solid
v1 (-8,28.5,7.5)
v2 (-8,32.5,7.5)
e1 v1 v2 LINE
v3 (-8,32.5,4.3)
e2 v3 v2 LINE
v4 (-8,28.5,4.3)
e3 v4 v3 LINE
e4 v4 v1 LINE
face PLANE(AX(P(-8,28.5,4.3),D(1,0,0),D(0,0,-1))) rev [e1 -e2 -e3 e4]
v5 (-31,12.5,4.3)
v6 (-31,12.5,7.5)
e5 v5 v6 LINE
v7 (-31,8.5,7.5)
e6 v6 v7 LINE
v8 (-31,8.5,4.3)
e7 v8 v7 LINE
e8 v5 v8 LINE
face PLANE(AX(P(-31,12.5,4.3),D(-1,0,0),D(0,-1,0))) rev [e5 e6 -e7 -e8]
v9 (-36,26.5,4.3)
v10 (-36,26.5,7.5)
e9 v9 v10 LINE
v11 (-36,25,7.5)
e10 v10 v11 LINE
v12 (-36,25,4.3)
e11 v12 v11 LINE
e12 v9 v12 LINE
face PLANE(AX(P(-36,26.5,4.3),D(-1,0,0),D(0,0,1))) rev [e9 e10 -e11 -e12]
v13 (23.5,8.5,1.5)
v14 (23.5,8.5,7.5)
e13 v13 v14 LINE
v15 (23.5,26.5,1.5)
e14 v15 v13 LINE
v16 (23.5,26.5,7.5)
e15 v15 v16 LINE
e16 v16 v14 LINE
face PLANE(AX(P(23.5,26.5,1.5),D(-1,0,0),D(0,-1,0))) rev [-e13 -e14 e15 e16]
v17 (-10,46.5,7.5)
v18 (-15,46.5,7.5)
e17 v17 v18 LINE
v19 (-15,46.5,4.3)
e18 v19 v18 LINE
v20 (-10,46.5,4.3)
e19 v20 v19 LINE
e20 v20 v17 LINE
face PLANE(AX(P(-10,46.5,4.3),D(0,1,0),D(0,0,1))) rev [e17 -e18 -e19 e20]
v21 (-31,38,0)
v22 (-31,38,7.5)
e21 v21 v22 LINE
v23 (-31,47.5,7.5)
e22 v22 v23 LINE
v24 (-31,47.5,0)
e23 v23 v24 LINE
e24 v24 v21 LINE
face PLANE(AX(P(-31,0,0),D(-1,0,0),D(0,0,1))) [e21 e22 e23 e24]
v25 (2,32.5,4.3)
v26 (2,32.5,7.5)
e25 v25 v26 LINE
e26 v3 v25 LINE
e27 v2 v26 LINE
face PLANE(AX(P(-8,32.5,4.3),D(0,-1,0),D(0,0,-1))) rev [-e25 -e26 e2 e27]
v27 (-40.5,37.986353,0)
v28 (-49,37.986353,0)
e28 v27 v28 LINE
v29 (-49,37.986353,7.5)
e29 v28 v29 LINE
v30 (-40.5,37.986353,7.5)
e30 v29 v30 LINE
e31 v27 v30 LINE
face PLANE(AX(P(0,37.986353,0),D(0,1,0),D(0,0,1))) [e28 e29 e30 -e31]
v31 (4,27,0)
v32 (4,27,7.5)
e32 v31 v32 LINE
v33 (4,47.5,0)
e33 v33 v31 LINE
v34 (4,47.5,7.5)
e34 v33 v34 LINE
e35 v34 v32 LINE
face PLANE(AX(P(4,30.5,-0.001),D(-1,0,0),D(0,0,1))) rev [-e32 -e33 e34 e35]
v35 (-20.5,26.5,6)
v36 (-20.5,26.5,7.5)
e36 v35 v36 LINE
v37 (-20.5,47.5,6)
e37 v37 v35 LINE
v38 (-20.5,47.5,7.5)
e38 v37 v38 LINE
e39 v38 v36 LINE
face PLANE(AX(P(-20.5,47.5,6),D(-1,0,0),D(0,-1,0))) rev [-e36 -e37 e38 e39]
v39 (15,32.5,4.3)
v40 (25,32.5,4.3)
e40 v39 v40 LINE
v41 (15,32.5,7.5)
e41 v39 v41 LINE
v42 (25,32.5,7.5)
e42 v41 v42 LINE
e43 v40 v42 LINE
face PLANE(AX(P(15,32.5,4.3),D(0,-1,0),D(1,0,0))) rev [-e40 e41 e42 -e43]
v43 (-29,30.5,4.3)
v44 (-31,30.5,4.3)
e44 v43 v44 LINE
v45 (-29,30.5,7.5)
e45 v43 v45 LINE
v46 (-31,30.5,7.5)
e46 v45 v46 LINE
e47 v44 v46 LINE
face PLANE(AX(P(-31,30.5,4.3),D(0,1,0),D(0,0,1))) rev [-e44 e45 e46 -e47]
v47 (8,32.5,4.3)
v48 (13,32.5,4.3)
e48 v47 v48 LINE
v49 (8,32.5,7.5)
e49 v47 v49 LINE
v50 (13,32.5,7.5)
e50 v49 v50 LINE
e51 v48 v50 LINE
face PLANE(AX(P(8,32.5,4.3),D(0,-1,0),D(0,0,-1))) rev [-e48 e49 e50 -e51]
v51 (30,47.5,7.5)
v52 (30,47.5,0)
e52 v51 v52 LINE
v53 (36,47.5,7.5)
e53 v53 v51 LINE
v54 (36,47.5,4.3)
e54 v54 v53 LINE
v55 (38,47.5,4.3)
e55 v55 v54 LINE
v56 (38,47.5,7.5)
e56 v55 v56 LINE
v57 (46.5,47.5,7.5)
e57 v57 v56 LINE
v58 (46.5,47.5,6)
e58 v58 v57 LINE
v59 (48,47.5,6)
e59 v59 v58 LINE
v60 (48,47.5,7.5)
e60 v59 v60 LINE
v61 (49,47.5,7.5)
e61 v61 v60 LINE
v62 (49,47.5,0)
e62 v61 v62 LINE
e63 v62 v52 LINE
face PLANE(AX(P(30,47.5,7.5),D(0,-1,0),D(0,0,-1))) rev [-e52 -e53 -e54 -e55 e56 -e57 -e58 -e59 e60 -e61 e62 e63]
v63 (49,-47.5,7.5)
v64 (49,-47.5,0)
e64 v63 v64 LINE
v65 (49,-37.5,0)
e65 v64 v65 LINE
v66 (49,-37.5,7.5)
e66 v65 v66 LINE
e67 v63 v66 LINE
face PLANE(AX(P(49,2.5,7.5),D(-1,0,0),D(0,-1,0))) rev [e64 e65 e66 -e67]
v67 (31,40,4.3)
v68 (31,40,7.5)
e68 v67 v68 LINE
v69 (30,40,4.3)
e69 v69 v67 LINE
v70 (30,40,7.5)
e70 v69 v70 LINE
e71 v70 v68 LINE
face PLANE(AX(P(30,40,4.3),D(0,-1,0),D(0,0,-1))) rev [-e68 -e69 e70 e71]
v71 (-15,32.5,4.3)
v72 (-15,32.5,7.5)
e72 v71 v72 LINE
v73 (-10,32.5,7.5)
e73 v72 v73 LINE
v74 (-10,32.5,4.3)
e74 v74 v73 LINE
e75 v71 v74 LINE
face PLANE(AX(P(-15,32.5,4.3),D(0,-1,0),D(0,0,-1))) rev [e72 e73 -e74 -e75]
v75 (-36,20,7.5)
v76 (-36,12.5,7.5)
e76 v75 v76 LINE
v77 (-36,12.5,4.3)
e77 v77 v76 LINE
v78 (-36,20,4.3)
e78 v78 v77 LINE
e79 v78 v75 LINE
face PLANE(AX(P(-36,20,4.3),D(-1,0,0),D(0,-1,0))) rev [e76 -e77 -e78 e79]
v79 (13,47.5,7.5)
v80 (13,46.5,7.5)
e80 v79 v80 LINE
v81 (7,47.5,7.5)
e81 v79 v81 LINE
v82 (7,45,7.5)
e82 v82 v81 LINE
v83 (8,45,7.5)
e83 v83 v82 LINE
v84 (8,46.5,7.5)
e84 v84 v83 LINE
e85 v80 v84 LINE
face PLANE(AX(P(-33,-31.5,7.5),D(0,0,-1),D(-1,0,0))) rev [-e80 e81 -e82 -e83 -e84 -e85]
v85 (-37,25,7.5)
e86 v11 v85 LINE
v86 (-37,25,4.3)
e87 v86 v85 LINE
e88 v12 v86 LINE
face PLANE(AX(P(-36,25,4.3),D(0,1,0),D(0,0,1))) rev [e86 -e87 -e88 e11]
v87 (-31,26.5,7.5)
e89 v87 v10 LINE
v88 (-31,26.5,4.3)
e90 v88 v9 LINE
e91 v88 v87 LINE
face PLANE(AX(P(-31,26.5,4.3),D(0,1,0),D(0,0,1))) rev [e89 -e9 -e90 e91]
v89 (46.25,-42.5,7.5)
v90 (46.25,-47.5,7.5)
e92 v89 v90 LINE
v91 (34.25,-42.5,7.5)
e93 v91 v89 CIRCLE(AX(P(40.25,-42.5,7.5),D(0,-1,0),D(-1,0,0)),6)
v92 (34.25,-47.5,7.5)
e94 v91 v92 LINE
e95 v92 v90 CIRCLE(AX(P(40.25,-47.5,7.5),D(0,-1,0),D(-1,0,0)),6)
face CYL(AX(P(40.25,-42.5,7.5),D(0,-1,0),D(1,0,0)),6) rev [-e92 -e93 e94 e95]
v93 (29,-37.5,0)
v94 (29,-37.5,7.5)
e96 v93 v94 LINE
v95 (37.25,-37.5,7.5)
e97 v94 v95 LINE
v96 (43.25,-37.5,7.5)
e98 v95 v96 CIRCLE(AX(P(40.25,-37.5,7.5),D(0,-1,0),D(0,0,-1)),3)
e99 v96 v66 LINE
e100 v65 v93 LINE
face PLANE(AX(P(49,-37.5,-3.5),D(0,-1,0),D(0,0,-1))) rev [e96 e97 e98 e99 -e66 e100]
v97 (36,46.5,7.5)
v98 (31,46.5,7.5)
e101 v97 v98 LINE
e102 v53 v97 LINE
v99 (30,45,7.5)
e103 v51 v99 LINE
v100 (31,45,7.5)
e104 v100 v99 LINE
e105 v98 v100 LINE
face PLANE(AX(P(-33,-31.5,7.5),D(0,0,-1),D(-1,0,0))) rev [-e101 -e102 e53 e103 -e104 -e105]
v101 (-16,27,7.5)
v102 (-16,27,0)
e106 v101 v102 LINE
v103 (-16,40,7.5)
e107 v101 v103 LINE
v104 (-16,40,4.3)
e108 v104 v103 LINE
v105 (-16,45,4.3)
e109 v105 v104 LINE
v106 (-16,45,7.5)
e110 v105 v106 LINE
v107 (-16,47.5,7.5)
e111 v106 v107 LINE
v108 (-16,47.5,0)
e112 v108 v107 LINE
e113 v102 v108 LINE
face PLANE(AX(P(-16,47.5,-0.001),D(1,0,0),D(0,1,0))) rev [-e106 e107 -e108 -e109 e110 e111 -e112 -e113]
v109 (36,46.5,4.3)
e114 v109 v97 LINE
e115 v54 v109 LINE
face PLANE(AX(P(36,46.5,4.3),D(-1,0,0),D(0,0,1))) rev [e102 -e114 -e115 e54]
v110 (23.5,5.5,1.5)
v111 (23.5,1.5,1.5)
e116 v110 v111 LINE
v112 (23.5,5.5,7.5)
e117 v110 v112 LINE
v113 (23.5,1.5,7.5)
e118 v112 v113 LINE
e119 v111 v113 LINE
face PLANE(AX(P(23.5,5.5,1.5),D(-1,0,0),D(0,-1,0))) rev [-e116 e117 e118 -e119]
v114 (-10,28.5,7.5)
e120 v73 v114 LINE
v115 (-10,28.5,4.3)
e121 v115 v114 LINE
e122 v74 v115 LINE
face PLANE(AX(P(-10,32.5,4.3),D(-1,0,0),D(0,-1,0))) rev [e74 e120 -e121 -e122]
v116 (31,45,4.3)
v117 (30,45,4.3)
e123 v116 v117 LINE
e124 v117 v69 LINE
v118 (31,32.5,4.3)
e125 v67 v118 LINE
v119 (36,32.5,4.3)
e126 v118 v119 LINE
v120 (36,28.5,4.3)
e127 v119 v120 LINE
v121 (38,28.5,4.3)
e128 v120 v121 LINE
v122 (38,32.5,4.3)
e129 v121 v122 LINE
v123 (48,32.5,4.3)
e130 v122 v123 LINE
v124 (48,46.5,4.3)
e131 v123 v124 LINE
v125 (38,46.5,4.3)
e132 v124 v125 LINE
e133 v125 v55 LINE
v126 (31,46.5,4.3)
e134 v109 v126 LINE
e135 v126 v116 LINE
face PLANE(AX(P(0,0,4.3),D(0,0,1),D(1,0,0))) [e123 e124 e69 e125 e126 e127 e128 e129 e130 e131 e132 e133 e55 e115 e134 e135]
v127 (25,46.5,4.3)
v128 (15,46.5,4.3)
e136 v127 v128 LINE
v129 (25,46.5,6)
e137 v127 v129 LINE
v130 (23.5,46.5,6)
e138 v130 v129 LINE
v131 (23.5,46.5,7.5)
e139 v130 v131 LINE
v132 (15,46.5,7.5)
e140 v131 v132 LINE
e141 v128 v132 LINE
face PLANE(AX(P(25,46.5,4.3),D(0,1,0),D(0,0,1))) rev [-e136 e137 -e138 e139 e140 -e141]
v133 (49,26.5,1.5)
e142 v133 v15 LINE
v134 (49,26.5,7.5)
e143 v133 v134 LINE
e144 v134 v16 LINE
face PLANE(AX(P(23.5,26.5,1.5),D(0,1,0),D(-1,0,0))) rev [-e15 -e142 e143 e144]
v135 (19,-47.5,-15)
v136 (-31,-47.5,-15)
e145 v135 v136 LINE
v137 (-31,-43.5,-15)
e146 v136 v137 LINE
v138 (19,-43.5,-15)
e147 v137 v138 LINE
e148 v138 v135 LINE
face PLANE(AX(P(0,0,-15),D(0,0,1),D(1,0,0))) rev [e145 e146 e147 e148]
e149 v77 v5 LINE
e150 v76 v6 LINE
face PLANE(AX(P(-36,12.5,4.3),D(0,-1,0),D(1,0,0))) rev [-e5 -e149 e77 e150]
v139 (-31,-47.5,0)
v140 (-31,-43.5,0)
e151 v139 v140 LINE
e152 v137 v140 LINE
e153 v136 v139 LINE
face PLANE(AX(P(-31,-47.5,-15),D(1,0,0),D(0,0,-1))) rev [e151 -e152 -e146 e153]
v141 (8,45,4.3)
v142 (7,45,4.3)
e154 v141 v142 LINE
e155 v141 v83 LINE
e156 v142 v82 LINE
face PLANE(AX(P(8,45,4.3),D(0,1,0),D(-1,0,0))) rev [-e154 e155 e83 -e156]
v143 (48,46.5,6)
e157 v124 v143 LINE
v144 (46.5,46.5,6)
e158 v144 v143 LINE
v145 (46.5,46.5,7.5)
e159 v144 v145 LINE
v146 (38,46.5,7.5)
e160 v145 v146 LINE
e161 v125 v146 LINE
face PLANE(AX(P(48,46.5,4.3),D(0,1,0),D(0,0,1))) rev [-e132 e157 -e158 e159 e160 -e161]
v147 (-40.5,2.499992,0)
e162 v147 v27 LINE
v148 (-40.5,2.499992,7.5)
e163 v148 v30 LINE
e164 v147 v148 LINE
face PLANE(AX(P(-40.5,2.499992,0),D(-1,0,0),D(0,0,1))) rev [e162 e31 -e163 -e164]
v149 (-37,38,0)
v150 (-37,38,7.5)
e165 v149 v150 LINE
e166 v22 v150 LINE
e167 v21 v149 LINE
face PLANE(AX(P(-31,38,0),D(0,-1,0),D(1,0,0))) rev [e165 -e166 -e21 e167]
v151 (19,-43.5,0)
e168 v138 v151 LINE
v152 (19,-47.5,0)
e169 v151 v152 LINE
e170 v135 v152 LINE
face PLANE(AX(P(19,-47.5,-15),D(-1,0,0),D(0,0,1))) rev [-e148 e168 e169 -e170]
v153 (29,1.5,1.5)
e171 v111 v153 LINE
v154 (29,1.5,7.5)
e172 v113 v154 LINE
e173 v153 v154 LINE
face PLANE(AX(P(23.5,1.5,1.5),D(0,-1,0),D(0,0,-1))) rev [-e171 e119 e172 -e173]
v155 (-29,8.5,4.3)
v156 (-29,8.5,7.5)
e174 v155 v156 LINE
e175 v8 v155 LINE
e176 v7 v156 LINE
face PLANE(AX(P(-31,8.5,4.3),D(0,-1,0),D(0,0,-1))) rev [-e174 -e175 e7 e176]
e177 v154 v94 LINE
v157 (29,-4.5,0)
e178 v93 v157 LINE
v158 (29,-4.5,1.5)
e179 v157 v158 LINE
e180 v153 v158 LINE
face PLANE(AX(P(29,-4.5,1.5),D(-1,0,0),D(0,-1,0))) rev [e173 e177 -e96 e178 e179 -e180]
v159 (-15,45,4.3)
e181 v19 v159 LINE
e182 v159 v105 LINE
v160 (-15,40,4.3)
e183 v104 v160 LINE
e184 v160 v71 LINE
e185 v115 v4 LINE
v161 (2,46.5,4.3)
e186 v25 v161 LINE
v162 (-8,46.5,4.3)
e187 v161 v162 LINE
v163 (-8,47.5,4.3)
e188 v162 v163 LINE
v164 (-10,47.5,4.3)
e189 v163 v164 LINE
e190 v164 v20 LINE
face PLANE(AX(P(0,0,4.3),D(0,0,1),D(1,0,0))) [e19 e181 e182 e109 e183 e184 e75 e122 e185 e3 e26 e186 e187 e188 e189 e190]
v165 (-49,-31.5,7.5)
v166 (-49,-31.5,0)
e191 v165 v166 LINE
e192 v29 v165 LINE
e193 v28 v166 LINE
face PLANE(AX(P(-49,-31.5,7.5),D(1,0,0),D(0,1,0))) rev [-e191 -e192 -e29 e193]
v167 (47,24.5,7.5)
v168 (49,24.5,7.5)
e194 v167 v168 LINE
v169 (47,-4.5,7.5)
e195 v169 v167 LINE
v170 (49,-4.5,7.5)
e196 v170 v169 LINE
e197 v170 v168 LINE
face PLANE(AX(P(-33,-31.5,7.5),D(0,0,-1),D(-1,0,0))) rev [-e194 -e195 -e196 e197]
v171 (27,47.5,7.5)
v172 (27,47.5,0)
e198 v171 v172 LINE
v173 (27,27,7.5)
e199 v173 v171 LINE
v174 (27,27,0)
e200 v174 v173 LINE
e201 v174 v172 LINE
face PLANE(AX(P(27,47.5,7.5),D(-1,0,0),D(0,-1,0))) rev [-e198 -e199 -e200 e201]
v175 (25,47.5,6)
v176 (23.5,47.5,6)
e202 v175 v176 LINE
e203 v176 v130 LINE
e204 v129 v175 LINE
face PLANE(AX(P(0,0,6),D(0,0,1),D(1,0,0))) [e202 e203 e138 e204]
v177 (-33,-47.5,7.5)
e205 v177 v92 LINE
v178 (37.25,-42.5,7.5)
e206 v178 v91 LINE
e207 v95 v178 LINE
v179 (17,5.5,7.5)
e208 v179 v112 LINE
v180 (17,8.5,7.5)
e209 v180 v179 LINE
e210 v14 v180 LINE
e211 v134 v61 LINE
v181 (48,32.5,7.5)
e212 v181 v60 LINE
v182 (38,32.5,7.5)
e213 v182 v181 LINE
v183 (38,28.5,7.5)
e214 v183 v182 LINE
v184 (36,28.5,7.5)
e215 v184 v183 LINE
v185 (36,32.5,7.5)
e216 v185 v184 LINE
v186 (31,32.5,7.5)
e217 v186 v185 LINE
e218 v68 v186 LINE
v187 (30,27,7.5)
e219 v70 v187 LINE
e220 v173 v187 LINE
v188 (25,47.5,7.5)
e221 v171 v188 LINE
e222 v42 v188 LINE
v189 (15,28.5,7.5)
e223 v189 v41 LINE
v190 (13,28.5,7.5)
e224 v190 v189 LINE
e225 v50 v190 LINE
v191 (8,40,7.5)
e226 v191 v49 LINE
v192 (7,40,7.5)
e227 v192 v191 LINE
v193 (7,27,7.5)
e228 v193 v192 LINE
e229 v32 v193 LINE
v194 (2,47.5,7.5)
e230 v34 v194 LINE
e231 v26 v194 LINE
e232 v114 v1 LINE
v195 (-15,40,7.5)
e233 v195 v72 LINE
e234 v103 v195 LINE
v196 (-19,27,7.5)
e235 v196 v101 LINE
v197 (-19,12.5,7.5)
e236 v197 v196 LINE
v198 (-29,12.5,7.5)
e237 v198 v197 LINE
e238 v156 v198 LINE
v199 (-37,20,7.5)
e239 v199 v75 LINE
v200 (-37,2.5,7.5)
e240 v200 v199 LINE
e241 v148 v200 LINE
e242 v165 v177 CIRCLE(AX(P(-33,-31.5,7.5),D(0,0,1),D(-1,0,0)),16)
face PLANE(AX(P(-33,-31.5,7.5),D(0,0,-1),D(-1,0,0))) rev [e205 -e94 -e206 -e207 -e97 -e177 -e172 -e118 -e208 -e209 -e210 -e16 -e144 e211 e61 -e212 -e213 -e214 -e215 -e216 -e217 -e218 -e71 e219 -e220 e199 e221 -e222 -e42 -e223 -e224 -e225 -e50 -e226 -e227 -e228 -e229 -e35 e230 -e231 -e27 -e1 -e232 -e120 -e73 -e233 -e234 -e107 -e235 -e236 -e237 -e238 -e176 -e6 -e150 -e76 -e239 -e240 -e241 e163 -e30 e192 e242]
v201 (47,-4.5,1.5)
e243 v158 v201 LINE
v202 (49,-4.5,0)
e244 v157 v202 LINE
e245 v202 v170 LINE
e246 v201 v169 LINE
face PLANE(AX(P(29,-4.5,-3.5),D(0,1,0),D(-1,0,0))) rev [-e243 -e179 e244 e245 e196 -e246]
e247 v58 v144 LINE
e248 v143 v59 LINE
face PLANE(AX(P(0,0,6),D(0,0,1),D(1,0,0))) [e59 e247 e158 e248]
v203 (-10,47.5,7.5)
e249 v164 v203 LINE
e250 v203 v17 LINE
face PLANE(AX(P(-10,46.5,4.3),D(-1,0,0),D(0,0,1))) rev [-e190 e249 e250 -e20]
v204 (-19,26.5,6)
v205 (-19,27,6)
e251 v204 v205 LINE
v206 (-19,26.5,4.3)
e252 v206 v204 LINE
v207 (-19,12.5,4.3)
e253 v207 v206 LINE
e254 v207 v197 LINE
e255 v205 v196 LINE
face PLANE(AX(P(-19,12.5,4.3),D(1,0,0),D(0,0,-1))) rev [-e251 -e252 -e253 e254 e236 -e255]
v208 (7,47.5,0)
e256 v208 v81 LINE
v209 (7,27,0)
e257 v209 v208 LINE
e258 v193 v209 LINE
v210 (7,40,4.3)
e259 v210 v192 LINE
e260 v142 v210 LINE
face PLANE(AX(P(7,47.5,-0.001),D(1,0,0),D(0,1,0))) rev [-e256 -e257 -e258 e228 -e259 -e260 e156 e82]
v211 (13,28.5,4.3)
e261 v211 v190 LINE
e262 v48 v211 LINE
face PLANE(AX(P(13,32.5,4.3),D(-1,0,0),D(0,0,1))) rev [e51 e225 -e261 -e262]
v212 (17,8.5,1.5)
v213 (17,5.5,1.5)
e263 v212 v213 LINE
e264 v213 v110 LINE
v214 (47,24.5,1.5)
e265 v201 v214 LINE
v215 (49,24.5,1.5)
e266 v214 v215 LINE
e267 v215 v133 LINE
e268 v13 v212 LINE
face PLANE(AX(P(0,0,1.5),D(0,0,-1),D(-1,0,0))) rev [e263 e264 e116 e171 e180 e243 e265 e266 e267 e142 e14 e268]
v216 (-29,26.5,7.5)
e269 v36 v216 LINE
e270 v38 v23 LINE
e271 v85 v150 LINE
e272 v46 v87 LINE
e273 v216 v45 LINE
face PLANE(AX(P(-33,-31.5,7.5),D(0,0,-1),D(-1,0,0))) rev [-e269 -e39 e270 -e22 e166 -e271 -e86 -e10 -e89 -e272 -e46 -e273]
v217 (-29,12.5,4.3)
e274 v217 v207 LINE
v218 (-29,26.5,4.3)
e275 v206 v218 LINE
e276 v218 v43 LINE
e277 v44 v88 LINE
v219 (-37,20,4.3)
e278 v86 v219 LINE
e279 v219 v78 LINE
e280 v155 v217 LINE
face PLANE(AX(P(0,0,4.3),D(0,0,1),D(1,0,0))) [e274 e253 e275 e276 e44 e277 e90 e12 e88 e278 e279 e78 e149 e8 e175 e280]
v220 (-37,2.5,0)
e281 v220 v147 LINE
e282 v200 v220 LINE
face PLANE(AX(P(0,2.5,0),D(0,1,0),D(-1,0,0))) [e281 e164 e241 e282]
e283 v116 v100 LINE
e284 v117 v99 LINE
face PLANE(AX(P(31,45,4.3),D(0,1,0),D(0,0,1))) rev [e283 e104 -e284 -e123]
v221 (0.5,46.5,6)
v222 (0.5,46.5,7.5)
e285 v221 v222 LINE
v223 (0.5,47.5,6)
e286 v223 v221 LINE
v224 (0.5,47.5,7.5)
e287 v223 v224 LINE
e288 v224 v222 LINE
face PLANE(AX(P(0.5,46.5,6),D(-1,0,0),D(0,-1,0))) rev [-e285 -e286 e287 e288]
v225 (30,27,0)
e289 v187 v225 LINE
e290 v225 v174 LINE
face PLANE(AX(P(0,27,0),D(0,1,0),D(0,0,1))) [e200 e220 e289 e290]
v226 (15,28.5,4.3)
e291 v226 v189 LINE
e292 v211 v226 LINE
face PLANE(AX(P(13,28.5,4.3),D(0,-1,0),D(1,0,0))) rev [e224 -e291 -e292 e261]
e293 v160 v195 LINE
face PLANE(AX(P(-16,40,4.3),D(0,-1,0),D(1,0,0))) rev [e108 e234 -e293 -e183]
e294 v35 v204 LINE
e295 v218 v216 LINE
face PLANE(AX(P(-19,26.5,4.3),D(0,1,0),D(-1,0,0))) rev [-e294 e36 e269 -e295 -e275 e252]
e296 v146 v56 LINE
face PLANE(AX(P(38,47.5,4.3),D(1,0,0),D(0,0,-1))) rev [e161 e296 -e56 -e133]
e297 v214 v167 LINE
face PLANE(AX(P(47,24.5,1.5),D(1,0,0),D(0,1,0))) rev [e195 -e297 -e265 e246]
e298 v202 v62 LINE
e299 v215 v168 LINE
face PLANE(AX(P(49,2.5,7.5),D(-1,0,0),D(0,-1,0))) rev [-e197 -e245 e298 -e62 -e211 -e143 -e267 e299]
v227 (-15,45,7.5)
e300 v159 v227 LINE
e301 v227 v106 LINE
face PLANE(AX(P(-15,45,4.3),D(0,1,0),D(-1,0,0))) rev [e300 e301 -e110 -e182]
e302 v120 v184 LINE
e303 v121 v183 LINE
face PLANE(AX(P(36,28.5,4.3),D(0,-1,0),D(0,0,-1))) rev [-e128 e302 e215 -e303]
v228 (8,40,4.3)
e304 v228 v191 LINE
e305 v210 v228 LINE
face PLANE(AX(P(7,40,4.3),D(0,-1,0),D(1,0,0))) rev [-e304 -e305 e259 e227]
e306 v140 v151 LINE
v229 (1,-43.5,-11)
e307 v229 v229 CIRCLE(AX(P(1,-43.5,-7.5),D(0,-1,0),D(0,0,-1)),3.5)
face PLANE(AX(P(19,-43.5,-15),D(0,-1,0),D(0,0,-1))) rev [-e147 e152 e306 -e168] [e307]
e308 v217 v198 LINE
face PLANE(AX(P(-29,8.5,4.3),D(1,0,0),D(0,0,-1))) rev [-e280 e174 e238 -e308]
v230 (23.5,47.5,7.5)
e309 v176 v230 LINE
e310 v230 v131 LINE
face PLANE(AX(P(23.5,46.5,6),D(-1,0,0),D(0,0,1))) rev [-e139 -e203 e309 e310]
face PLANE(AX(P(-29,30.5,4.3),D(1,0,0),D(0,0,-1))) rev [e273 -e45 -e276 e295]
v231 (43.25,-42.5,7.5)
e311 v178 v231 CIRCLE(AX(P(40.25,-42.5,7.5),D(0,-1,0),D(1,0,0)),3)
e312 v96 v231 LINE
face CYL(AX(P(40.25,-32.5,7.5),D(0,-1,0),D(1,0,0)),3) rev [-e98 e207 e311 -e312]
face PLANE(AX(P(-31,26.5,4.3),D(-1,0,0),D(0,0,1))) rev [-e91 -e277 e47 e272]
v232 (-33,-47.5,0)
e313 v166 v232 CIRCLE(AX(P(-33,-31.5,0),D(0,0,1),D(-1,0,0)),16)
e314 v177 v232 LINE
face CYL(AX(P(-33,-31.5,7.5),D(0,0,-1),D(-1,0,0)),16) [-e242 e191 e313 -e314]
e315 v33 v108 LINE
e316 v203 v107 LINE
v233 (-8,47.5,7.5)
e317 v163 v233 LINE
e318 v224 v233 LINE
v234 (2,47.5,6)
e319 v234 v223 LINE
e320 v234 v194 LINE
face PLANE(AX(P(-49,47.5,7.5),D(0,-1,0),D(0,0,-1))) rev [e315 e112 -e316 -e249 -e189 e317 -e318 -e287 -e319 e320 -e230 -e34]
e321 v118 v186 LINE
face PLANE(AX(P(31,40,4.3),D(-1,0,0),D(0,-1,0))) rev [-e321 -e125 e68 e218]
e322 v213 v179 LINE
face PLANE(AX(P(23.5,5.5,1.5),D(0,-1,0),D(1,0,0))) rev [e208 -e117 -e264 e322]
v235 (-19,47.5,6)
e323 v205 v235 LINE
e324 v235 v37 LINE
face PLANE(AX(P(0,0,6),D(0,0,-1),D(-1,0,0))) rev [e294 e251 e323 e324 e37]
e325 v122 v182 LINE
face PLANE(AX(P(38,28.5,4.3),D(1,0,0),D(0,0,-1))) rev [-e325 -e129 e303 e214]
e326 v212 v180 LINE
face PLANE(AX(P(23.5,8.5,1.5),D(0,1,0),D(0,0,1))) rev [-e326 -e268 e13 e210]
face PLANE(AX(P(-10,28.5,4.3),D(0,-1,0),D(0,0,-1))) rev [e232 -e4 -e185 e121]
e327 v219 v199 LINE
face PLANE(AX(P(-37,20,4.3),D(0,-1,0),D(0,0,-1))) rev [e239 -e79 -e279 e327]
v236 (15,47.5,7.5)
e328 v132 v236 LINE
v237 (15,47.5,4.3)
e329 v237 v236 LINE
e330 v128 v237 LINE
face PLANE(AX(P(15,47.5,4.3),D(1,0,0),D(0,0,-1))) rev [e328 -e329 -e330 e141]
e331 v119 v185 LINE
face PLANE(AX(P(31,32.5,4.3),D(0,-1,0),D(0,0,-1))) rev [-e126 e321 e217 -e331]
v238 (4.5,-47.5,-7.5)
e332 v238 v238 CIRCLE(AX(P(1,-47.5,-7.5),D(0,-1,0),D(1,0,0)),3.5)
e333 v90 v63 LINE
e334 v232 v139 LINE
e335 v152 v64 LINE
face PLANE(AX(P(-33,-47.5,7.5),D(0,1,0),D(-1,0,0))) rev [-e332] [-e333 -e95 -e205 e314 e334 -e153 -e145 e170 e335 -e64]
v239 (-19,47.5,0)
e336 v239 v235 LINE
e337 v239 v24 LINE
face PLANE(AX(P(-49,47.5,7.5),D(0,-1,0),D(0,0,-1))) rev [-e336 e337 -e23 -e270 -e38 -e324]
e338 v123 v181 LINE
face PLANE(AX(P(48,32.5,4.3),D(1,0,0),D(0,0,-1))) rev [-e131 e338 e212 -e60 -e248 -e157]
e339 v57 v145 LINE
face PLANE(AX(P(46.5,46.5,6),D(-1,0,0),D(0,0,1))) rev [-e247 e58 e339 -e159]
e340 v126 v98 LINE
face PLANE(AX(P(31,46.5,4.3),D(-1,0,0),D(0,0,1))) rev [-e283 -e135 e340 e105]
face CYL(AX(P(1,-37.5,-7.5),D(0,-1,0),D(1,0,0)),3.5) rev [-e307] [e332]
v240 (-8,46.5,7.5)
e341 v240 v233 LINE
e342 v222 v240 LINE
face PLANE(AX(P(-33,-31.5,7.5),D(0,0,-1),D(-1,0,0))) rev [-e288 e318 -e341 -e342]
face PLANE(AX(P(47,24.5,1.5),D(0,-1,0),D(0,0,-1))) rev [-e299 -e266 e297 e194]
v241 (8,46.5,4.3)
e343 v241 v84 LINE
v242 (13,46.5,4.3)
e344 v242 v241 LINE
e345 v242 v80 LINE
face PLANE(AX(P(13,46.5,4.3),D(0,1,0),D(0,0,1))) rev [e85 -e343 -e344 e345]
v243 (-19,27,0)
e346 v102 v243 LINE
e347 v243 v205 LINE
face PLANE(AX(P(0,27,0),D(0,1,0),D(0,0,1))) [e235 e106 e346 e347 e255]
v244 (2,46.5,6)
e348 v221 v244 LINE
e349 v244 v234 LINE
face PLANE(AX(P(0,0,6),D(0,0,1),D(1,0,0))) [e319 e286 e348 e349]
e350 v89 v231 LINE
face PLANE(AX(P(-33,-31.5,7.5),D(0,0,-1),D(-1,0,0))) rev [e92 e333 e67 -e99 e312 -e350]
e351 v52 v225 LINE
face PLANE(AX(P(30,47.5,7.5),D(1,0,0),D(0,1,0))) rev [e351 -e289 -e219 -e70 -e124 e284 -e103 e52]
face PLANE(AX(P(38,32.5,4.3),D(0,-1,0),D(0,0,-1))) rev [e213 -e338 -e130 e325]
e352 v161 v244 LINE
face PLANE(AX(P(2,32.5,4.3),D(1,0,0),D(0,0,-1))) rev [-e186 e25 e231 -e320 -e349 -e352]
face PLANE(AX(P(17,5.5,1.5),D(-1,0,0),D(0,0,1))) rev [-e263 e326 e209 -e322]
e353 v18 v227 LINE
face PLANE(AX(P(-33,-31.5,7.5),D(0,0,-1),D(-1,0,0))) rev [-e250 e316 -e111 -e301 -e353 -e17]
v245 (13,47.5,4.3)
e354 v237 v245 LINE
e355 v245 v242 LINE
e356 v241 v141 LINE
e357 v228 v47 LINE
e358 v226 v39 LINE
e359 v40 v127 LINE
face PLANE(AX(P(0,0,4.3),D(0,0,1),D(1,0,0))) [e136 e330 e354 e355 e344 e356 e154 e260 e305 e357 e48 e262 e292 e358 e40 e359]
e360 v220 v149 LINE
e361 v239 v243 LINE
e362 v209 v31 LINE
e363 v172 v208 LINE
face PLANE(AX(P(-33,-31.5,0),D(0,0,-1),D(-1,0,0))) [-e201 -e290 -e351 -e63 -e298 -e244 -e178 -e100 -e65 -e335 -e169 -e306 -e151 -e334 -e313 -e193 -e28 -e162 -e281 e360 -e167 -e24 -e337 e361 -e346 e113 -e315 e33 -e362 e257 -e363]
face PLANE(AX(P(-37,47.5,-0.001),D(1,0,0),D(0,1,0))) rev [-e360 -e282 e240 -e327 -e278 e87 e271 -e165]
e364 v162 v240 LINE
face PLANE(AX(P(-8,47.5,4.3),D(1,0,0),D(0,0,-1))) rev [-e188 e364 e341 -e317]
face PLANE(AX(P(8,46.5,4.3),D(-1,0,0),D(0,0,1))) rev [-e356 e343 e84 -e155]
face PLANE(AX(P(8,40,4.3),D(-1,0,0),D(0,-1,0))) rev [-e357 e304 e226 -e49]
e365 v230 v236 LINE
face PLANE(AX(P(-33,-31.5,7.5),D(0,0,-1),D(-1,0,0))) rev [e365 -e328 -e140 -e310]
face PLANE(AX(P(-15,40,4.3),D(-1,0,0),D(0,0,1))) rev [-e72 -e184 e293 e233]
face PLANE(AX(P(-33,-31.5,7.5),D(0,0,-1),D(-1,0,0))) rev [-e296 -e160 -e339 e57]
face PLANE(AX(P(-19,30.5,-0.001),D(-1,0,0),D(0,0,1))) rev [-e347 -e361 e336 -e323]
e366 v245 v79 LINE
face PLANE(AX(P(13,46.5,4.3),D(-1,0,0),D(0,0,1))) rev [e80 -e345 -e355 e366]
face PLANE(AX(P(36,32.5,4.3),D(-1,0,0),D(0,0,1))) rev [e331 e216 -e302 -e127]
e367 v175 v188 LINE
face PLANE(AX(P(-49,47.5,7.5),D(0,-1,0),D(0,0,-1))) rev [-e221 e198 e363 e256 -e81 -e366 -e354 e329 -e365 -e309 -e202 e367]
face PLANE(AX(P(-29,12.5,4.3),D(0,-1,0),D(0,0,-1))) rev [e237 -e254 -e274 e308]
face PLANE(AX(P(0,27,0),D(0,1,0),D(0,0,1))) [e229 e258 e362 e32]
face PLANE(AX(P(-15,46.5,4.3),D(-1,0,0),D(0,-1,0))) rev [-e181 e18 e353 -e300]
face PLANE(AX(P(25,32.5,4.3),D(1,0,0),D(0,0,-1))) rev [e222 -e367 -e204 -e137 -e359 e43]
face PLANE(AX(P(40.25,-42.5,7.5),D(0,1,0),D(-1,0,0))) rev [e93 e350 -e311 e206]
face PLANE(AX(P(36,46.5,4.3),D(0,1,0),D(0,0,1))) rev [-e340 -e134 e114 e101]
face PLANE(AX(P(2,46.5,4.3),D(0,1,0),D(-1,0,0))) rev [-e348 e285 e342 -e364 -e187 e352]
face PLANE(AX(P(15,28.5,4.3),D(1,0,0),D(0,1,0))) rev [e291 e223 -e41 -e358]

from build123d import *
from OCP.BRepAlgoAPI import BRepAlgoAPI_Cut
from OCP.TopTools import TopTools_ListOfShape
from build123d.topology import SkipClean

# Parameters (mm, degrees)
BOSS_EXTRUDE1_DEPTH = 7.5
CUT_EXTRUDE1_DEPTH  = 3.2
CUT_EXTRUDE4_REACH  = 70.655
SKETCH5_W           = 3
SKETCH5_H           = 17
CUT_EXTRUDE5_REACH  = 70.655
SKETCH8_W           = 12
SKETCH8_H           = 37
CUT_EXTRUDE6_DEPTH  = 3.2
SKETCH10_W          = 10
SKETCH10_H          = 7.5
BOSS_EXTRUDE2_DEPTH = 27.486353186
SKETCH11_W          = 3
SKETCH11_H          = 7.5
CUT_EXTRUDE7_DEPTH  = 3.5
SKETCH12_W          = 2
SKETCH12_H          = 7.5
CUT_EXTRUDE8_DEPTH  = 4
SKETCH13_W          = 2
SKETCH13_H          = 7.5
CUT_EXTRUDE9_DEPTH  = 4
SKETCH14_W          = 7.5
SKETCH14_H          = 9.5
CUT_EXTRUDE10_DEPTH = 6
SKETCH15_W          = 1.5
SKETCH15_H          = 21
SKETCH15_H_2        = 1
CUT_EXTRUDE11_DEPTH = 1.5
SKETCH16_W          = 1.5
SKETCH16_H          = 7.5
CUT_EXTRUDE12_DEPTH = 35.486360958
CUT_EXTRUDE13_DEPTH = 6
SKETCH19_W          = 17.5
SKETCH19_H          = 32
BOSS_EXTRUDE3_DEPTH = 7.5
CUT_EXTRUDE14_DEPTH = 6
SKETCH20_W          = 18
SKETCH20_H          = 6
CUT_EXTRUDE15_DEPTH = 6
SKETCH21_W          = 20
SKETCH21_H          = 33
CUT_EXTRUDE16_DEPTH = 11
CUT_EXTRUDE17_DEPTH = 5
CUT_EXTRUDE18_DEPTH = 10
SKETCH23_W          = 50
SKETCH23_H          = 4
BOSS_EXTRUDE4_DEPTH = 15
SKETCH25_R          = 3.5
CUT_EXTRUDE19_DEPTH = 10


with BuildPart() as part:
    # Sketch1 → Boss-Extrude1 (new body)
    with BuildSketch(Plane.XY):
        with BuildLine():
            Line((-33, -47.5), (49, -47.5))
            Line((49, -47.5), (49, -29.5))
            Line((49, -29.5), (31.5, -29.5))
            Line((31.5, -29.5), (31.5, 2.5))
            Line((31.5, 2.5), (49, 2.5))
            Line((49, 2.5), (49, 47.5))
            Line((49, 47.5), (30, 47.5))
            Line((30, 47.5), (30, 30.5))
            Line((30, 30.5), (27, 30.5))
            Line((27, 30.5), (27, 47.5))
            Line((27, 47.5), (-49, 47.5))
            Line((-49, 47.5), (-49, -31.5))
            ThreePointArc((-49, -31.5), (-44.313708499, -42.813708499), (-33, -47.5))
        make_face()
    extrude(amount=BOSS_EXTRUDE1_DEPTH)

    # Sketch2 → Cut-Extrude1 (cut)
    with BuildSketch(Plane.XY.offset(7.5)):
        Polygon((30, 40), (31, 40), (31, 32.5), (36, 32.5), (36, 28.5), (38, 28.5), (38, 32.5), (48, 32.5), (48, 46.5), (38, 46.5), (38, 47.5), (36, 47.5), (36, 46.5), (31, 46.5), (31, 45), (30, 45), align=None)
        Polygon((-16, 40), (-15, 40), (-15, 32.5), (-10, 32.5), (-10, 28.5), (-8, 28.5), (-8, 32.5), (2, 32.5), (2, 46.5), (-8, 46.5), (-8, 47.5), (-10, 47.5), (-10, 46.5), (-15, 46.5), (-15, 45), (-16, 45), align=None)
        Polygon((7, 40), (8, 40), (8, 32.5), (13, 32.5), (13, 28.5), (15, 28.5), (15, 32.5), (25, 32.5), (25, 46.5), (15, 46.5), (15, 47.5), (13, 47.5), (13, 46.5), (8, 46.5), (8, 45), (7, 45), align=None)
    extrude(amount=-CUT_EXTRUDE1_DEPTH, mode=Mode.SUBTRACT)

    # Sketch5 → Cut-Extrude4 (cut, up to next)
    with BuildSketch(Plane.XY.offset(7.5), mode=Mode.PRIVATE) as cut_extrude4_sk1:
        with Locations((5.5, 39)):
            Rectangle(SKETCH5_W, SKETCH5_H)
    cut_extrude4_tool1 = extrude(cut_extrude4_sk1.sketch, amount=-CUT_EXTRUDE4_REACH, mode=Mode.PRIVATE) & part.part
    # Sketch5 → Cut-Extrude4 (cut, up to next)
    with BuildSketch(Plane.XY.offset(7.5), mode=Mode.PRIVATE) as cut_extrude4_sk2:
        with Locations((-17.5, 39)):
            Rectangle(SKETCH5_W, SKETCH5_H)
    cut_extrude4_tool2 = extrude(cut_extrude4_sk2.sketch, amount=-CUT_EXTRUDE4_REACH, mode=Mode.PRIVATE) & part.part
    add(cut_extrude4_tool1.solids().sort_by_distance((5.5, 39, 7.5))[0], mode=Mode.SUBTRACT)
    add(cut_extrude4_tool2.solids().sort_by_distance((-17.5, 39, 7.5))[0], mode=Mode.SUBTRACT)

    # Sketch8 → Cut-Extrude5 (cut, up to next)
    with BuildSketch(Plane.XY.offset(7.5), mode=Mode.PRIVATE) as cut_extrude5_sk1:
        with Locations((-43, 29)):
            Rectangle(SKETCH8_W, SKETCH8_H)
    cut_extrude5_tool1 = extrude(cut_extrude5_sk1.sketch, amount=-CUT_EXTRUDE5_REACH, mode=Mode.PRIVATE) & part.part
    add(cut_extrude5_tool1.solids().sort_by_distance((-43, 29, 7.5))[0], mode=Mode.SUBTRACT)

    # Sketch9 → Cut-Extrude6 (cut)
    with BuildSketch(Plane.XY.offset(7.5)):
        Polygon((-37, 20), (-36, 20), (-36, 12.5), (-31, 12.5), (-31, 8.5), (-29, 8.5), (-29, 12.5), (-19, 12.5), (-19, 26.5), (-29, 26.5), (-29, 30.5), (-31, 30.5), (-31, 26.5), (-36, 26.5), (-36, 25), (-37, 25), align=None)
    extrude(amount=-CUT_EXTRUDE6_DEPTH, mode=Mode.SUBTRACT)

    # Sketch10 → Boss-Extrude2 (add)
    with BuildSketch(Plane(origin=(0, 10.5, 0), x_dir=(1, 0, 0), z_dir=(0, 1, 0))):
        with Locations((-44, -3.75)):
            Rectangle(SKETCH10_W, SKETCH10_H)
    extrude(amount=BOSS_EXTRUDE2_DEPTH)

    # Sketch11 → Cut-Extrude7 (cut)
    with BuildSketch(Plane(origin=(0, 30.5, 0), x_dir=(1, 0, 0), z_dir=(0, 1, 0))):
        with Locations((-17.5, -3.75)):
            Rectangle(SKETCH11_W, SKETCH11_H)
        with Locations((5.5, -3.75)):
            Rectangle(SKETCH11_W, SKETCH11_H)
        with Locations((28.5, -3.75)):
            Rectangle(SKETCH11_W, SKETCH11_H)
    extrude(amount=-CUT_EXTRUDE7_DEPTH, mode=Mode.SUBTRACT)

    # Sketch12 → Cut-Extrude8 (cut)
    with BuildSketch(Plane(origin=(0, 10.5, 0), x_dir=(1, 0, 0), z_dir=(0, 1, 0))):
        with Locations((-38, -3.75)):
            Rectangle(SKETCH12_W, SKETCH12_H)
    extrude(amount=-CUT_EXTRUDE8_DEPTH, mode=Mode.SUBTRACT)

    # Sketch13 → Cut-Extrude9 (cut)
    with BuildSketch(Plane(origin=(0, 6.5, 0), x_dir=(1, 0, 0), z_dir=(0, 1, 0))):
        with Locations((-38, -3.75)):
            Rectangle(SKETCH13_W, SKETCH13_H)
    extrude(amount=-CUT_EXTRUDE9_DEPTH, mode=Mode.SUBTRACT)

    # Sketch14 → Cut-Extrude10 (cut)
    with BuildSketch(Plane.ZY.offset(37)):
        with Locations((3.75, 42.75)):
            Rectangle(SKETCH14_W, SKETCH14_H)
    extrude(amount=-CUT_EXTRUDE10_DEPTH, mode=Mode.SUBTRACT)

    # Sketch15 → Cut-Extrude11 (cut)
    with BuildSketch(Plane.XY.offset(7.5)):
        with Locations((-19.75, 37)):
            Rectangle(SKETCH15_W, SKETCH15_H)
        with Locations((1.25, 47)):
            Rectangle(SKETCH15_W, SKETCH15_H_2)
        with Locations((24.25, 47)):
            Rectangle(SKETCH15_W, SKETCH15_H_2)
        with Locations((47.25, 47)):
            Rectangle(SKETCH15_W, SKETCH15_H_2)
    extrude(amount=-CUT_EXTRUDE11_DEPTH, mode=Mode.SUBTRACT)


with BuildPart() as cut_extrude12_tool:
    # Sketch16 → Cut-Extrude12 (new body)
    with BuildSketch(Plane(origin=(0, 37.986353186, 0), x_dir=(1, 0, 0), z_dir=(0, 1, 0))):
        with Locations((-39.75, -3.75)):
            Rectangle(SKETCH16_W, SKETCH16_H)
    extrude(amount=-CUT_EXTRUDE12_DEPTH)


with BuildPart() as part_1:
    add(part.part)

    # Cut-Extrude12: cut by cut_extrude12_tool, with a tolerance
    cut_extrude12_stock = TopTools_ListOfShape()
    cut_extrude12_stock.Append(part_1.part.wrapped)
    cut_extrude12_tools = TopTools_ListOfShape()
    cut_extrude12_tools.Append(cut_extrude12_tool.part.wrapped)
    cut_extrude12_cut = BRepAlgoAPI_Cut()
    cut_extrude12_cut.SetArguments(cut_extrude12_stock)
    cut_extrude12_cut.SetTools(cut_extrude12_tools)
    cut_extrude12_cut.SetFuzzyValue(0.00001)
    cut_extrude12_cut.Build()
    add(Compound.cast(cut_extrude12_cut.Shape()).solids(), mode=Mode.REPLACE)

    # Sketch18 → Cut-Extrude13 (cut)
    with SkipClean():  # the faces are left unmerged after this step: merging them gives an invalid solid
        with BuildSketch(Plane.XY.offset(7.5)):
            Polygon((23.5, 5.5), (23.5, 1.5), (47, 1.5), (47, 24.5), (49, 24.5), (49, 26.5), (47, 26.5), (23.5, 26.5), (23.5, 8.5), (17, 8.5), (17, 5.5), align=None)
        extrude(amount=-CUT_EXTRUDE13_DEPTH, mode=Mode.SUBTRACT)

    # Sketch19 → Boss-Extrude3 (add)
    with SkipClean():  # the faces are left unmerged after this step: merging them gives an invalid solid
        with BuildSketch(Plane(origin=(0, 0, 0), x_dir=(-1, 0, 0), z_dir=(0, 0, -1))):
            with Locations((-40.25, -13.5)):
                Rectangle(SKETCH19_W, SKETCH19_H)
        extrude(amount=-BOSS_EXTRUDE3_DEPTH)

    # Sketch18<2> → Cut-Extrude14 (cut)
    with SkipClean():  # the faces are left unmerged after this step: merging them gives an invalid solid
        with BuildSketch(Plane.XY.offset(7.5)):
            Polygon((23.5, 5.5), (23.5, 1.5), (47, 1.5), (47, 24.5), (49, 24.5), (49, 26.5), (47, 26.5), (23.5, 26.5), (23.5, 8.5), (17, 8.5), (17, 5.5), align=None)
        extrude(amount=-CUT_EXTRUDE14_DEPTH, mode=Mode.SUBTRACT)

    # Sketch20 → Cut-Extrude15 (cut)
    with SkipClean():  # the faces are left unmerged after this step: merging them gives an invalid solid
        with BuildSketch(Plane.XY.offset(7.5)):
            with Locations((38, -1.5)):
                Rectangle(SKETCH20_W, SKETCH20_H)
        extrude(amount=-CUT_EXTRUDE15_DEPTH, mode=Mode.SUBTRACT)

    # Sketch21 → Cut-Extrude16 (cut)
    with SkipClean():  # the faces are left unmerged after this step: merging them gives an invalid solid
        with BuildSketch(Plane.XY.offset(7.5)):
            with Locations((39, -21)):
                Rectangle(SKETCH21_W, SKETCH21_H)
        extrude(amount=-CUT_EXTRUDE16_DEPTH, mode=Mode.SUBTRACT)

    # Sketch3 → Cut-Extrude17 (cut)
    with SkipClean():  # the faces are left unmerged after this step: merging them gives an invalid solid
        with BuildSketch(Plane.XZ.offset(47.5)):
            with BuildLine():
                Line((34.25, 7.5), (46.25, 7.5))
                ThreePointArc((46.25, 7.5), (40.25, 1.5), (34.25, 7.5))
            make_face()
        extrude(amount=-CUT_EXTRUDE17_DEPTH, mode=Mode.SUBTRACT)

    # Sketch22 → Cut-Extrude18 (cut)
    with SkipClean():  # the faces are left unmerged after this step: merging them gives an invalid solid
        with BuildSketch(Plane.XZ.offset(42.5)):
            with BuildLine():
                Line((37.25, 7.5), (43.25, 7.5))
                ThreePointArc((43.25, 7.5), (40.25, 4.5), (37.25, 7.5))
            make_face()
        extrude(amount=-CUT_EXTRUDE18_DEPTH, mode=Mode.SUBTRACT)

    # Sketch23 → Boss-Extrude4 (add)
    with SkipClean():  # the faces are left unmerged after this step: merging them gives an invalid solid
        with BuildSketch(Plane(origin=(0, 0, 0), x_dir=(-1, 0, 0), z_dir=(0, 0, -1))):
            with Locations((6, -45.5)):
                Rectangle(SKETCH23_W, SKETCH23_H)
        extrude(amount=BOSS_EXTRUDE4_DEPTH)

    # Sketch25 → Cut-Extrude19 (cut)
    with SkipClean():  # the faces are left unmerged after this step: merging them gives an invalid solid
        with BuildSketch(Plane(origin=(0, -47.5, 0), x_dir=(-1, 0, 0), z_dir=(0, -1, 0))):
            with Locations((-1, 7.5)):
                Circle(SKETCH25_R)
        extrude(amount=-CUT_EXTRUDE19_DEPTH, mode=Mode.SUBTRACT)


solid = part_1.part
